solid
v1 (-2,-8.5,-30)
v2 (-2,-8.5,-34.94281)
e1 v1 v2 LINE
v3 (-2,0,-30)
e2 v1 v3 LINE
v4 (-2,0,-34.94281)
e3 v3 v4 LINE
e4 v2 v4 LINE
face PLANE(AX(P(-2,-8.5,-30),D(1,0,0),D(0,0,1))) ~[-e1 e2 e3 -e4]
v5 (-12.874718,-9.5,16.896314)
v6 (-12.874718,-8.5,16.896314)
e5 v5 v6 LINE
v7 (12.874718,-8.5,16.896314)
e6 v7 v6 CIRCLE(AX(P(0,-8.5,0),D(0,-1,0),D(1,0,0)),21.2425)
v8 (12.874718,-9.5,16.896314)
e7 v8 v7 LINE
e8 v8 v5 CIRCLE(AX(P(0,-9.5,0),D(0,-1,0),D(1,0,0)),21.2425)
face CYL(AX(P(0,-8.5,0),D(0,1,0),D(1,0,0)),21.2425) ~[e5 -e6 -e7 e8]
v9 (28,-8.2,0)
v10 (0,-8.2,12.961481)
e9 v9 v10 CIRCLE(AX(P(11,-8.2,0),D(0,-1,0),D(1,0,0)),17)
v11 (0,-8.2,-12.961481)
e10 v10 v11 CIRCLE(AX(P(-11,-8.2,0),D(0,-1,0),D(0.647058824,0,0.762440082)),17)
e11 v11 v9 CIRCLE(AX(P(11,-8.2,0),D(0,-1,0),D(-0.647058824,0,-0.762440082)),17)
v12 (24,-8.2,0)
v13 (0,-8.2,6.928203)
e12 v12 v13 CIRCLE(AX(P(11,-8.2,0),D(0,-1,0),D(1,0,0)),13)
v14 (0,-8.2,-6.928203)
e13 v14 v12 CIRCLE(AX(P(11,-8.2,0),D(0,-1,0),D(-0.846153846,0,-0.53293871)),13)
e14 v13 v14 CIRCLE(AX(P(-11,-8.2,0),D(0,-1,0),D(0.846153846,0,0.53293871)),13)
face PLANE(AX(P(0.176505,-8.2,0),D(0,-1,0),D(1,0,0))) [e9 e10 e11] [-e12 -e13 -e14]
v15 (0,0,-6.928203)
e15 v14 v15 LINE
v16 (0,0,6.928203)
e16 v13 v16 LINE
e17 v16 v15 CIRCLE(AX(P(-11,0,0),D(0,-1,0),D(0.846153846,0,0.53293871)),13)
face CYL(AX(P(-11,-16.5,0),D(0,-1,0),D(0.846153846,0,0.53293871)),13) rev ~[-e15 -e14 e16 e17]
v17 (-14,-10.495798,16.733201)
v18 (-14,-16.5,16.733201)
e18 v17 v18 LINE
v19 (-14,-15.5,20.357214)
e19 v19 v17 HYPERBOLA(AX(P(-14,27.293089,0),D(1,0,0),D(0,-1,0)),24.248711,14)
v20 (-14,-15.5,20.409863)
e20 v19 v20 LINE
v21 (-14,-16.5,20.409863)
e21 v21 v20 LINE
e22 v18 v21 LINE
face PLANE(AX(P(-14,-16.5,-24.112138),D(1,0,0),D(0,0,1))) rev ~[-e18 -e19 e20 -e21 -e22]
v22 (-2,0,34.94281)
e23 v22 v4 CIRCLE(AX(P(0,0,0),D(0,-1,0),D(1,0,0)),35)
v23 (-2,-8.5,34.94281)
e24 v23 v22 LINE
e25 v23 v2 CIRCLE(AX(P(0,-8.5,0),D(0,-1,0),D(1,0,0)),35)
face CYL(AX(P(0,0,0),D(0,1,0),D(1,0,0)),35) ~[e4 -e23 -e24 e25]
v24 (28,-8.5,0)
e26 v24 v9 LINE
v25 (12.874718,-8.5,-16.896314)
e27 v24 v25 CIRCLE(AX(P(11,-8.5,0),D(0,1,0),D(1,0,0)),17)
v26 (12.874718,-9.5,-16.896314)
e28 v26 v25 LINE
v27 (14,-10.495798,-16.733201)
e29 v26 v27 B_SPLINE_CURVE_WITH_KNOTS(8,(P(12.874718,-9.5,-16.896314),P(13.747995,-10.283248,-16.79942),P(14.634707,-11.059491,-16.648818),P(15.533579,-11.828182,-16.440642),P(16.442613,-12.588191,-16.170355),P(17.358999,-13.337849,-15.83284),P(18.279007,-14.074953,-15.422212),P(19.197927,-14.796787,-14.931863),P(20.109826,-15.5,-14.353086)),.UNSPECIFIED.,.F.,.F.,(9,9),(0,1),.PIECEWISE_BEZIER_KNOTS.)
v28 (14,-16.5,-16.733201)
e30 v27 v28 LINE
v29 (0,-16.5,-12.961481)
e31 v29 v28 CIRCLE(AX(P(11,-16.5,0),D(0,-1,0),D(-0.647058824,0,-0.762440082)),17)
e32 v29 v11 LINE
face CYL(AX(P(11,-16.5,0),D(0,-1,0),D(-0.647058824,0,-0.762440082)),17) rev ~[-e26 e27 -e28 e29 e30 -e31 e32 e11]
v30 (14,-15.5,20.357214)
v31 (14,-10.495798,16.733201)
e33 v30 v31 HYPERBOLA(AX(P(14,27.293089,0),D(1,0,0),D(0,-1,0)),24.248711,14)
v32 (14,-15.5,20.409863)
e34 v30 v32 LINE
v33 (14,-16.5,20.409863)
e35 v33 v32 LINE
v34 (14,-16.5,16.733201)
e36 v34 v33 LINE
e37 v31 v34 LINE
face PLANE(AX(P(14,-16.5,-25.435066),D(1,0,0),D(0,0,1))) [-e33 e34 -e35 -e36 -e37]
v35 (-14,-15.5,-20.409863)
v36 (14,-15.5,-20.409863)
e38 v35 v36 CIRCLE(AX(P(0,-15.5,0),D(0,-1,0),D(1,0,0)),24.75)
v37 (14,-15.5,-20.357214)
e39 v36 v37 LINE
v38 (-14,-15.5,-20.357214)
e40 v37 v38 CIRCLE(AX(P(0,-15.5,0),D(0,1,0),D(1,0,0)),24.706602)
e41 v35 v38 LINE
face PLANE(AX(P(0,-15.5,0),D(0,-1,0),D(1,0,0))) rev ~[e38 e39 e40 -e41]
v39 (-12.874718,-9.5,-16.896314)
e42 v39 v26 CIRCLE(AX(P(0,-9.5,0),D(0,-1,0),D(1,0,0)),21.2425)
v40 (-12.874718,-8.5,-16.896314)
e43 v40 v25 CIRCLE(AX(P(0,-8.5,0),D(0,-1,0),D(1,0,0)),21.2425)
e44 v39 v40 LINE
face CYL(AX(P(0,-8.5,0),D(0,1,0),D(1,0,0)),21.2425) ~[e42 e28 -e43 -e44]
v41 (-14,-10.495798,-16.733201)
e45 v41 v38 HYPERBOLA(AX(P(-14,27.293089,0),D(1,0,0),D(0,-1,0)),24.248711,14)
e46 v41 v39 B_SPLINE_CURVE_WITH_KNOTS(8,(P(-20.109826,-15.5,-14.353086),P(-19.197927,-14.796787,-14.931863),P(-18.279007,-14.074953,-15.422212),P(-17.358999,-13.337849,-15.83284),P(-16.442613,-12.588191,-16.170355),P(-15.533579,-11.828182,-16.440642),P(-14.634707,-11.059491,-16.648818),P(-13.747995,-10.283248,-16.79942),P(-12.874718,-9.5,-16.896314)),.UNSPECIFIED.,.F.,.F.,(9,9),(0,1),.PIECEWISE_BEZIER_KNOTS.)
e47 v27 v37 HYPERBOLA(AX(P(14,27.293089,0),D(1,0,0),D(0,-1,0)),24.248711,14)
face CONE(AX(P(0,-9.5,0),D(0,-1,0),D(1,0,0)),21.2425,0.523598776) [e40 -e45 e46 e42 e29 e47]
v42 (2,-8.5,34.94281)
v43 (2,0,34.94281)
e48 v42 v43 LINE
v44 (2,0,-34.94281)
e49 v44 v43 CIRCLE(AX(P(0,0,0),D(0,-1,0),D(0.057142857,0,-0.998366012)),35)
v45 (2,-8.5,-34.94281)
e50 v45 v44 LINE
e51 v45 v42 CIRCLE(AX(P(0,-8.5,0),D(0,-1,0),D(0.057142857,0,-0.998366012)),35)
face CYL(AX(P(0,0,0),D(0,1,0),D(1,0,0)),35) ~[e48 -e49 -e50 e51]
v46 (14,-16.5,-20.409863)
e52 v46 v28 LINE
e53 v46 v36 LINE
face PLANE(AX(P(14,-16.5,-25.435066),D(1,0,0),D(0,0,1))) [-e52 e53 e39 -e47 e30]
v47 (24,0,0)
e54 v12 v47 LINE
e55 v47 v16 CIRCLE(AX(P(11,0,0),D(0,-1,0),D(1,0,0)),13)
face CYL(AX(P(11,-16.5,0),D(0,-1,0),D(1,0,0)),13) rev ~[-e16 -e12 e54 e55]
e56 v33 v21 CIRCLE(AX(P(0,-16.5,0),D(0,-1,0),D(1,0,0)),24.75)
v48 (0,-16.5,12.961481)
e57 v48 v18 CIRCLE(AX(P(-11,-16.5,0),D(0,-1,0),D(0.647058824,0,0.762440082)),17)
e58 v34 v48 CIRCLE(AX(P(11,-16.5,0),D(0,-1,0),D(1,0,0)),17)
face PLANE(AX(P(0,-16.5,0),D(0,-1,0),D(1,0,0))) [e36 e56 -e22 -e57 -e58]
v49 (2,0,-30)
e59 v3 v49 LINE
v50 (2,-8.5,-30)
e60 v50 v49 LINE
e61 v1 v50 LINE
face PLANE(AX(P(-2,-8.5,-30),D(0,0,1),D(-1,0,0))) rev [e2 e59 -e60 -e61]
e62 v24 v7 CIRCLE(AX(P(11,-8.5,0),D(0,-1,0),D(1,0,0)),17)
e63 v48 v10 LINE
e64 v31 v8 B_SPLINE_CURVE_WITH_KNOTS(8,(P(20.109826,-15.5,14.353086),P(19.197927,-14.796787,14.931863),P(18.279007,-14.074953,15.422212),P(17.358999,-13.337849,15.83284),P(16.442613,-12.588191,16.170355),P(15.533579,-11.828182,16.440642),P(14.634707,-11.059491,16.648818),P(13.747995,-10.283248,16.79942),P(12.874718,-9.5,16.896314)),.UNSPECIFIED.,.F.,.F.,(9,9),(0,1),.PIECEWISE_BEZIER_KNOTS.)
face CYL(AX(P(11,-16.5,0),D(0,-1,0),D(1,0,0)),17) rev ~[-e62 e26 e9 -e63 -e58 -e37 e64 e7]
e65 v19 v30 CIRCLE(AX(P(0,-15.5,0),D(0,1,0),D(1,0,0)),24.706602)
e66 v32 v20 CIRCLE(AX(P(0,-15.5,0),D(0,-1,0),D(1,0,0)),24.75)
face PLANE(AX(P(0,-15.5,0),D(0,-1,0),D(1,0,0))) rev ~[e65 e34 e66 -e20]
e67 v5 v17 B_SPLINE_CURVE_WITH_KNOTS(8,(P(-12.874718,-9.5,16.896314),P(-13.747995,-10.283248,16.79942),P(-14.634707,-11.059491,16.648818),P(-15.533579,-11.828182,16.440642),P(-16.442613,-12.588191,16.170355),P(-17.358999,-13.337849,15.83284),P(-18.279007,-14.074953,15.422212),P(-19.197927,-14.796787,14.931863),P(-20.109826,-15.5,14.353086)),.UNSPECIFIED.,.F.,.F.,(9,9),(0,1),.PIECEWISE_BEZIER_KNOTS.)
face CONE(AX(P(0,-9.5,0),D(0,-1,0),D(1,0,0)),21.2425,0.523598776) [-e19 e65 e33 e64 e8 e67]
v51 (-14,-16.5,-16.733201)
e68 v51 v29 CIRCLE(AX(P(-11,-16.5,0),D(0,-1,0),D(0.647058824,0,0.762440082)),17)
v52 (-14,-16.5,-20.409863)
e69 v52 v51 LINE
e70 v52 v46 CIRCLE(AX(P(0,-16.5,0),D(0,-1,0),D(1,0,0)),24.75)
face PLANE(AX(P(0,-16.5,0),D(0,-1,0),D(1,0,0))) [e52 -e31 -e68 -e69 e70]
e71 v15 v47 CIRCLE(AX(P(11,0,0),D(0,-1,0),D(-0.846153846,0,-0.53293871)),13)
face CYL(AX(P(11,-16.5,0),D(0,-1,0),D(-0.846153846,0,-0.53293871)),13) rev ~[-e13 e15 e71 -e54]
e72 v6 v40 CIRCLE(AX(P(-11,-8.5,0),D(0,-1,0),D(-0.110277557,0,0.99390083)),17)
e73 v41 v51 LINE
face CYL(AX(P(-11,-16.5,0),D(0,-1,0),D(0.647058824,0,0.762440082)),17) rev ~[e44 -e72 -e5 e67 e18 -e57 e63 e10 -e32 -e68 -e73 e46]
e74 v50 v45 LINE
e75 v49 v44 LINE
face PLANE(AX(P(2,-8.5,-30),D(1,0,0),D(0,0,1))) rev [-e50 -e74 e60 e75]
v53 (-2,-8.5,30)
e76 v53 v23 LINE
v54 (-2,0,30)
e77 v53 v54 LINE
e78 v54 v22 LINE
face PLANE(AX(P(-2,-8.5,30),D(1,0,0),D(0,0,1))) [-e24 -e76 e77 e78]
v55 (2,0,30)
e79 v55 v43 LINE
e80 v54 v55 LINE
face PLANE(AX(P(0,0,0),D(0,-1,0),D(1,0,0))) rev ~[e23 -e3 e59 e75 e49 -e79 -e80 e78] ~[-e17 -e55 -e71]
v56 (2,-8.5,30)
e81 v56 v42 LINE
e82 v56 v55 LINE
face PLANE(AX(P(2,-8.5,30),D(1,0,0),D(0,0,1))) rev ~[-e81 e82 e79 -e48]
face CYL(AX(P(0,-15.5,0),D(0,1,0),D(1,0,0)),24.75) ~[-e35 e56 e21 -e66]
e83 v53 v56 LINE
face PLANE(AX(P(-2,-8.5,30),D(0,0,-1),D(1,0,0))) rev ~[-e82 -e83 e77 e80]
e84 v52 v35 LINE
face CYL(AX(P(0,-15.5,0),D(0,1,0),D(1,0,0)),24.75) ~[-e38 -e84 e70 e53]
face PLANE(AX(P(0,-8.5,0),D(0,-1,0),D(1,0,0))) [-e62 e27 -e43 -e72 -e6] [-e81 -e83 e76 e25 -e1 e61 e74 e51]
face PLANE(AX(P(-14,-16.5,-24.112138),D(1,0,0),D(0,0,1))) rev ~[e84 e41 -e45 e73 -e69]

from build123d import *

# Parameters (mm, degrees)
F0_R      = 35
F1_DEPTH  = 8.5
F2_R      = 21.2425
F3_DEPTH  = 1
F4_R      = 21.2425
F5_DEPTH  = 6
F5_TAPER  = -30
F6_R      = 24.75
F7_DEPTH  = 1
F9_DEPTH  = 16.5
F11_DEPTH = 8.3
F12_W     = 12.0533492022
F12_H     = 52.1821774244
F12_W_2   = 10.4364354849
F12_H_2   = 52.770149804
F13_DEPTH = 8
F14_W     = 4
F14_H     = 6
F15_DEPTH = 8.5


# Not quite as in the source:
# - a pattern or mirror of a feature is missing from the dataset's text; its kind, count and spacing are read off the source's solid


with BuildPart() as f1:
    # F0 (on Front) → F1 (new body)
    with BuildSketch(Plane.XZ):
        Circle(F0_R)
    extrude(amount=F1_DEPTH)

    # F2 (on face) → F3 (join)
    with BuildSketch(Plane.XZ.offset(8.5)):
        Circle(F2_R)
    extrude(amount=F3_DEPTH)

    # F4 (on face) → F5 (join)
    with BuildSketch(Plane.XZ.offset(9.5)):
        Circle(F4_R)
    extrude(amount=F5_DEPTH, taper=F5_TAPER)

    # F6 (on face) → F7 (join)
    with BuildSketch(Plane.XZ.offset(15.5)):
        Circle(F6_R)
    extrude(amount=F7_DEPTH)

    # F8 (on face) → F9 (cut)
    with BuildSketch(Plane.XZ.offset(16.5)):
        with BuildLine():
            ThreePointArc((0, -6.9282032303), (1.4899959968, -3.6055512755), (2, 0))
            ThreePointArc((2, 0), (1.4899959968, 3.6055512755), (0, 6.9282032303))
            ThreePointArc((0, 6.9282032303), (-2, 0), (0, -6.9282032303))
        make_face()
        with BuildLine():
            ThreePointArc((0, 6.9282032303), (1.4899959968, 3.6055512755), (2, 0))
            ThreePointArc((2, 0), (1.4899959968, -3.6055512755), (0, -6.9282032303))
            ThreePointArc((0, -6.9282032303), (14.6055512755, -12.4899959968), (24, 0))
            ThreePointArc((24, 0), (14.6055512755, 12.4899959968), (0, 6.9282032303))
        make_face()
        with BuildLine():
            ThreePointArc((0, -6.9282032303), (-2, 0), (0, 6.9282032303))
            ThreePointArc((0, 6.9282032303), (-24, 0), (0, -6.9282032303))
        make_face()
    extrude(amount=-F9_DEPTH, mode=Mode.SUBTRACT)

    # F10 (on face) → F11 (cut)
    with BuildSketch(Plane.XZ.offset(16.5)):
        with BuildLine():
            ThreePointArc((0, -12.9614813968), (4.4272486205, -7.1414284285), (6, 0))
            ThreePointArc((6, 0), (4.4272486205, 7.1414284285), (0, 12.9614813968))
            ThreePointArc((0, 12.9614813968), (-6, 0), (0, -12.9614813968))
        make_face()
        with BuildLine():
            ThreePointArc((0, 12.9614813968), (4.4272486205, 7.1414284285), (6, 0))
            ThreePointArc((6, 0), (4.4272486205, -7.1414284285), (0, -12.9614813968))
            ThreePointArc((0, -12.9614813968), (18.1414284285, -15.4272486205), (28, 0))
            ThreePointArc((28, 0), (18.1414284285, 15.4272486205), (0, 12.9614813968))
        make_face()
        with BuildLine():
            ThreePointArc((0, -12.9614813968), (-6, 0), (0, 12.9614813968))
            ThreePointArc((0, 12.9614813968), (-28, 0), (0, -12.9614813968))
        make_face()
    extrude(amount=-F11_DEPTH, mode=Mode.SUBTRACT)

    # F12 (on face) → F13 (cut)
    with BuildSketch(Plane.XZ.offset(16.5)):
        with Locations((20.0266746011, 0.6560230852)):
            Rectangle(F12_W, F12_H)
        with Locations((-19.2182177424, 2.2729368025)):
            Rectangle(F12_W_2, F12_H_2)
    extrude(amount=-F13_DEPTH, mode=Mode.SUBTRACT)

    # F14 (on face) → F15 (cut)
    with BuildSketch(Plane.XZ.offset(8.5)):
        with Locations((0, 33)):
            Rectangle(F14_W, F14_H)
    f15 = extrude(amount=-F15_DEPTH, mode=Mode.SUBTRACT)

    # F15_copies: F15 across plane
    add(f15.mirror(Plane(origin=(0, 0, 0), x_dir=(-1, 0, 0), z_dir=(0, 0, -1))), mode=Mode.SUBTRACT)


solid = f1.part
